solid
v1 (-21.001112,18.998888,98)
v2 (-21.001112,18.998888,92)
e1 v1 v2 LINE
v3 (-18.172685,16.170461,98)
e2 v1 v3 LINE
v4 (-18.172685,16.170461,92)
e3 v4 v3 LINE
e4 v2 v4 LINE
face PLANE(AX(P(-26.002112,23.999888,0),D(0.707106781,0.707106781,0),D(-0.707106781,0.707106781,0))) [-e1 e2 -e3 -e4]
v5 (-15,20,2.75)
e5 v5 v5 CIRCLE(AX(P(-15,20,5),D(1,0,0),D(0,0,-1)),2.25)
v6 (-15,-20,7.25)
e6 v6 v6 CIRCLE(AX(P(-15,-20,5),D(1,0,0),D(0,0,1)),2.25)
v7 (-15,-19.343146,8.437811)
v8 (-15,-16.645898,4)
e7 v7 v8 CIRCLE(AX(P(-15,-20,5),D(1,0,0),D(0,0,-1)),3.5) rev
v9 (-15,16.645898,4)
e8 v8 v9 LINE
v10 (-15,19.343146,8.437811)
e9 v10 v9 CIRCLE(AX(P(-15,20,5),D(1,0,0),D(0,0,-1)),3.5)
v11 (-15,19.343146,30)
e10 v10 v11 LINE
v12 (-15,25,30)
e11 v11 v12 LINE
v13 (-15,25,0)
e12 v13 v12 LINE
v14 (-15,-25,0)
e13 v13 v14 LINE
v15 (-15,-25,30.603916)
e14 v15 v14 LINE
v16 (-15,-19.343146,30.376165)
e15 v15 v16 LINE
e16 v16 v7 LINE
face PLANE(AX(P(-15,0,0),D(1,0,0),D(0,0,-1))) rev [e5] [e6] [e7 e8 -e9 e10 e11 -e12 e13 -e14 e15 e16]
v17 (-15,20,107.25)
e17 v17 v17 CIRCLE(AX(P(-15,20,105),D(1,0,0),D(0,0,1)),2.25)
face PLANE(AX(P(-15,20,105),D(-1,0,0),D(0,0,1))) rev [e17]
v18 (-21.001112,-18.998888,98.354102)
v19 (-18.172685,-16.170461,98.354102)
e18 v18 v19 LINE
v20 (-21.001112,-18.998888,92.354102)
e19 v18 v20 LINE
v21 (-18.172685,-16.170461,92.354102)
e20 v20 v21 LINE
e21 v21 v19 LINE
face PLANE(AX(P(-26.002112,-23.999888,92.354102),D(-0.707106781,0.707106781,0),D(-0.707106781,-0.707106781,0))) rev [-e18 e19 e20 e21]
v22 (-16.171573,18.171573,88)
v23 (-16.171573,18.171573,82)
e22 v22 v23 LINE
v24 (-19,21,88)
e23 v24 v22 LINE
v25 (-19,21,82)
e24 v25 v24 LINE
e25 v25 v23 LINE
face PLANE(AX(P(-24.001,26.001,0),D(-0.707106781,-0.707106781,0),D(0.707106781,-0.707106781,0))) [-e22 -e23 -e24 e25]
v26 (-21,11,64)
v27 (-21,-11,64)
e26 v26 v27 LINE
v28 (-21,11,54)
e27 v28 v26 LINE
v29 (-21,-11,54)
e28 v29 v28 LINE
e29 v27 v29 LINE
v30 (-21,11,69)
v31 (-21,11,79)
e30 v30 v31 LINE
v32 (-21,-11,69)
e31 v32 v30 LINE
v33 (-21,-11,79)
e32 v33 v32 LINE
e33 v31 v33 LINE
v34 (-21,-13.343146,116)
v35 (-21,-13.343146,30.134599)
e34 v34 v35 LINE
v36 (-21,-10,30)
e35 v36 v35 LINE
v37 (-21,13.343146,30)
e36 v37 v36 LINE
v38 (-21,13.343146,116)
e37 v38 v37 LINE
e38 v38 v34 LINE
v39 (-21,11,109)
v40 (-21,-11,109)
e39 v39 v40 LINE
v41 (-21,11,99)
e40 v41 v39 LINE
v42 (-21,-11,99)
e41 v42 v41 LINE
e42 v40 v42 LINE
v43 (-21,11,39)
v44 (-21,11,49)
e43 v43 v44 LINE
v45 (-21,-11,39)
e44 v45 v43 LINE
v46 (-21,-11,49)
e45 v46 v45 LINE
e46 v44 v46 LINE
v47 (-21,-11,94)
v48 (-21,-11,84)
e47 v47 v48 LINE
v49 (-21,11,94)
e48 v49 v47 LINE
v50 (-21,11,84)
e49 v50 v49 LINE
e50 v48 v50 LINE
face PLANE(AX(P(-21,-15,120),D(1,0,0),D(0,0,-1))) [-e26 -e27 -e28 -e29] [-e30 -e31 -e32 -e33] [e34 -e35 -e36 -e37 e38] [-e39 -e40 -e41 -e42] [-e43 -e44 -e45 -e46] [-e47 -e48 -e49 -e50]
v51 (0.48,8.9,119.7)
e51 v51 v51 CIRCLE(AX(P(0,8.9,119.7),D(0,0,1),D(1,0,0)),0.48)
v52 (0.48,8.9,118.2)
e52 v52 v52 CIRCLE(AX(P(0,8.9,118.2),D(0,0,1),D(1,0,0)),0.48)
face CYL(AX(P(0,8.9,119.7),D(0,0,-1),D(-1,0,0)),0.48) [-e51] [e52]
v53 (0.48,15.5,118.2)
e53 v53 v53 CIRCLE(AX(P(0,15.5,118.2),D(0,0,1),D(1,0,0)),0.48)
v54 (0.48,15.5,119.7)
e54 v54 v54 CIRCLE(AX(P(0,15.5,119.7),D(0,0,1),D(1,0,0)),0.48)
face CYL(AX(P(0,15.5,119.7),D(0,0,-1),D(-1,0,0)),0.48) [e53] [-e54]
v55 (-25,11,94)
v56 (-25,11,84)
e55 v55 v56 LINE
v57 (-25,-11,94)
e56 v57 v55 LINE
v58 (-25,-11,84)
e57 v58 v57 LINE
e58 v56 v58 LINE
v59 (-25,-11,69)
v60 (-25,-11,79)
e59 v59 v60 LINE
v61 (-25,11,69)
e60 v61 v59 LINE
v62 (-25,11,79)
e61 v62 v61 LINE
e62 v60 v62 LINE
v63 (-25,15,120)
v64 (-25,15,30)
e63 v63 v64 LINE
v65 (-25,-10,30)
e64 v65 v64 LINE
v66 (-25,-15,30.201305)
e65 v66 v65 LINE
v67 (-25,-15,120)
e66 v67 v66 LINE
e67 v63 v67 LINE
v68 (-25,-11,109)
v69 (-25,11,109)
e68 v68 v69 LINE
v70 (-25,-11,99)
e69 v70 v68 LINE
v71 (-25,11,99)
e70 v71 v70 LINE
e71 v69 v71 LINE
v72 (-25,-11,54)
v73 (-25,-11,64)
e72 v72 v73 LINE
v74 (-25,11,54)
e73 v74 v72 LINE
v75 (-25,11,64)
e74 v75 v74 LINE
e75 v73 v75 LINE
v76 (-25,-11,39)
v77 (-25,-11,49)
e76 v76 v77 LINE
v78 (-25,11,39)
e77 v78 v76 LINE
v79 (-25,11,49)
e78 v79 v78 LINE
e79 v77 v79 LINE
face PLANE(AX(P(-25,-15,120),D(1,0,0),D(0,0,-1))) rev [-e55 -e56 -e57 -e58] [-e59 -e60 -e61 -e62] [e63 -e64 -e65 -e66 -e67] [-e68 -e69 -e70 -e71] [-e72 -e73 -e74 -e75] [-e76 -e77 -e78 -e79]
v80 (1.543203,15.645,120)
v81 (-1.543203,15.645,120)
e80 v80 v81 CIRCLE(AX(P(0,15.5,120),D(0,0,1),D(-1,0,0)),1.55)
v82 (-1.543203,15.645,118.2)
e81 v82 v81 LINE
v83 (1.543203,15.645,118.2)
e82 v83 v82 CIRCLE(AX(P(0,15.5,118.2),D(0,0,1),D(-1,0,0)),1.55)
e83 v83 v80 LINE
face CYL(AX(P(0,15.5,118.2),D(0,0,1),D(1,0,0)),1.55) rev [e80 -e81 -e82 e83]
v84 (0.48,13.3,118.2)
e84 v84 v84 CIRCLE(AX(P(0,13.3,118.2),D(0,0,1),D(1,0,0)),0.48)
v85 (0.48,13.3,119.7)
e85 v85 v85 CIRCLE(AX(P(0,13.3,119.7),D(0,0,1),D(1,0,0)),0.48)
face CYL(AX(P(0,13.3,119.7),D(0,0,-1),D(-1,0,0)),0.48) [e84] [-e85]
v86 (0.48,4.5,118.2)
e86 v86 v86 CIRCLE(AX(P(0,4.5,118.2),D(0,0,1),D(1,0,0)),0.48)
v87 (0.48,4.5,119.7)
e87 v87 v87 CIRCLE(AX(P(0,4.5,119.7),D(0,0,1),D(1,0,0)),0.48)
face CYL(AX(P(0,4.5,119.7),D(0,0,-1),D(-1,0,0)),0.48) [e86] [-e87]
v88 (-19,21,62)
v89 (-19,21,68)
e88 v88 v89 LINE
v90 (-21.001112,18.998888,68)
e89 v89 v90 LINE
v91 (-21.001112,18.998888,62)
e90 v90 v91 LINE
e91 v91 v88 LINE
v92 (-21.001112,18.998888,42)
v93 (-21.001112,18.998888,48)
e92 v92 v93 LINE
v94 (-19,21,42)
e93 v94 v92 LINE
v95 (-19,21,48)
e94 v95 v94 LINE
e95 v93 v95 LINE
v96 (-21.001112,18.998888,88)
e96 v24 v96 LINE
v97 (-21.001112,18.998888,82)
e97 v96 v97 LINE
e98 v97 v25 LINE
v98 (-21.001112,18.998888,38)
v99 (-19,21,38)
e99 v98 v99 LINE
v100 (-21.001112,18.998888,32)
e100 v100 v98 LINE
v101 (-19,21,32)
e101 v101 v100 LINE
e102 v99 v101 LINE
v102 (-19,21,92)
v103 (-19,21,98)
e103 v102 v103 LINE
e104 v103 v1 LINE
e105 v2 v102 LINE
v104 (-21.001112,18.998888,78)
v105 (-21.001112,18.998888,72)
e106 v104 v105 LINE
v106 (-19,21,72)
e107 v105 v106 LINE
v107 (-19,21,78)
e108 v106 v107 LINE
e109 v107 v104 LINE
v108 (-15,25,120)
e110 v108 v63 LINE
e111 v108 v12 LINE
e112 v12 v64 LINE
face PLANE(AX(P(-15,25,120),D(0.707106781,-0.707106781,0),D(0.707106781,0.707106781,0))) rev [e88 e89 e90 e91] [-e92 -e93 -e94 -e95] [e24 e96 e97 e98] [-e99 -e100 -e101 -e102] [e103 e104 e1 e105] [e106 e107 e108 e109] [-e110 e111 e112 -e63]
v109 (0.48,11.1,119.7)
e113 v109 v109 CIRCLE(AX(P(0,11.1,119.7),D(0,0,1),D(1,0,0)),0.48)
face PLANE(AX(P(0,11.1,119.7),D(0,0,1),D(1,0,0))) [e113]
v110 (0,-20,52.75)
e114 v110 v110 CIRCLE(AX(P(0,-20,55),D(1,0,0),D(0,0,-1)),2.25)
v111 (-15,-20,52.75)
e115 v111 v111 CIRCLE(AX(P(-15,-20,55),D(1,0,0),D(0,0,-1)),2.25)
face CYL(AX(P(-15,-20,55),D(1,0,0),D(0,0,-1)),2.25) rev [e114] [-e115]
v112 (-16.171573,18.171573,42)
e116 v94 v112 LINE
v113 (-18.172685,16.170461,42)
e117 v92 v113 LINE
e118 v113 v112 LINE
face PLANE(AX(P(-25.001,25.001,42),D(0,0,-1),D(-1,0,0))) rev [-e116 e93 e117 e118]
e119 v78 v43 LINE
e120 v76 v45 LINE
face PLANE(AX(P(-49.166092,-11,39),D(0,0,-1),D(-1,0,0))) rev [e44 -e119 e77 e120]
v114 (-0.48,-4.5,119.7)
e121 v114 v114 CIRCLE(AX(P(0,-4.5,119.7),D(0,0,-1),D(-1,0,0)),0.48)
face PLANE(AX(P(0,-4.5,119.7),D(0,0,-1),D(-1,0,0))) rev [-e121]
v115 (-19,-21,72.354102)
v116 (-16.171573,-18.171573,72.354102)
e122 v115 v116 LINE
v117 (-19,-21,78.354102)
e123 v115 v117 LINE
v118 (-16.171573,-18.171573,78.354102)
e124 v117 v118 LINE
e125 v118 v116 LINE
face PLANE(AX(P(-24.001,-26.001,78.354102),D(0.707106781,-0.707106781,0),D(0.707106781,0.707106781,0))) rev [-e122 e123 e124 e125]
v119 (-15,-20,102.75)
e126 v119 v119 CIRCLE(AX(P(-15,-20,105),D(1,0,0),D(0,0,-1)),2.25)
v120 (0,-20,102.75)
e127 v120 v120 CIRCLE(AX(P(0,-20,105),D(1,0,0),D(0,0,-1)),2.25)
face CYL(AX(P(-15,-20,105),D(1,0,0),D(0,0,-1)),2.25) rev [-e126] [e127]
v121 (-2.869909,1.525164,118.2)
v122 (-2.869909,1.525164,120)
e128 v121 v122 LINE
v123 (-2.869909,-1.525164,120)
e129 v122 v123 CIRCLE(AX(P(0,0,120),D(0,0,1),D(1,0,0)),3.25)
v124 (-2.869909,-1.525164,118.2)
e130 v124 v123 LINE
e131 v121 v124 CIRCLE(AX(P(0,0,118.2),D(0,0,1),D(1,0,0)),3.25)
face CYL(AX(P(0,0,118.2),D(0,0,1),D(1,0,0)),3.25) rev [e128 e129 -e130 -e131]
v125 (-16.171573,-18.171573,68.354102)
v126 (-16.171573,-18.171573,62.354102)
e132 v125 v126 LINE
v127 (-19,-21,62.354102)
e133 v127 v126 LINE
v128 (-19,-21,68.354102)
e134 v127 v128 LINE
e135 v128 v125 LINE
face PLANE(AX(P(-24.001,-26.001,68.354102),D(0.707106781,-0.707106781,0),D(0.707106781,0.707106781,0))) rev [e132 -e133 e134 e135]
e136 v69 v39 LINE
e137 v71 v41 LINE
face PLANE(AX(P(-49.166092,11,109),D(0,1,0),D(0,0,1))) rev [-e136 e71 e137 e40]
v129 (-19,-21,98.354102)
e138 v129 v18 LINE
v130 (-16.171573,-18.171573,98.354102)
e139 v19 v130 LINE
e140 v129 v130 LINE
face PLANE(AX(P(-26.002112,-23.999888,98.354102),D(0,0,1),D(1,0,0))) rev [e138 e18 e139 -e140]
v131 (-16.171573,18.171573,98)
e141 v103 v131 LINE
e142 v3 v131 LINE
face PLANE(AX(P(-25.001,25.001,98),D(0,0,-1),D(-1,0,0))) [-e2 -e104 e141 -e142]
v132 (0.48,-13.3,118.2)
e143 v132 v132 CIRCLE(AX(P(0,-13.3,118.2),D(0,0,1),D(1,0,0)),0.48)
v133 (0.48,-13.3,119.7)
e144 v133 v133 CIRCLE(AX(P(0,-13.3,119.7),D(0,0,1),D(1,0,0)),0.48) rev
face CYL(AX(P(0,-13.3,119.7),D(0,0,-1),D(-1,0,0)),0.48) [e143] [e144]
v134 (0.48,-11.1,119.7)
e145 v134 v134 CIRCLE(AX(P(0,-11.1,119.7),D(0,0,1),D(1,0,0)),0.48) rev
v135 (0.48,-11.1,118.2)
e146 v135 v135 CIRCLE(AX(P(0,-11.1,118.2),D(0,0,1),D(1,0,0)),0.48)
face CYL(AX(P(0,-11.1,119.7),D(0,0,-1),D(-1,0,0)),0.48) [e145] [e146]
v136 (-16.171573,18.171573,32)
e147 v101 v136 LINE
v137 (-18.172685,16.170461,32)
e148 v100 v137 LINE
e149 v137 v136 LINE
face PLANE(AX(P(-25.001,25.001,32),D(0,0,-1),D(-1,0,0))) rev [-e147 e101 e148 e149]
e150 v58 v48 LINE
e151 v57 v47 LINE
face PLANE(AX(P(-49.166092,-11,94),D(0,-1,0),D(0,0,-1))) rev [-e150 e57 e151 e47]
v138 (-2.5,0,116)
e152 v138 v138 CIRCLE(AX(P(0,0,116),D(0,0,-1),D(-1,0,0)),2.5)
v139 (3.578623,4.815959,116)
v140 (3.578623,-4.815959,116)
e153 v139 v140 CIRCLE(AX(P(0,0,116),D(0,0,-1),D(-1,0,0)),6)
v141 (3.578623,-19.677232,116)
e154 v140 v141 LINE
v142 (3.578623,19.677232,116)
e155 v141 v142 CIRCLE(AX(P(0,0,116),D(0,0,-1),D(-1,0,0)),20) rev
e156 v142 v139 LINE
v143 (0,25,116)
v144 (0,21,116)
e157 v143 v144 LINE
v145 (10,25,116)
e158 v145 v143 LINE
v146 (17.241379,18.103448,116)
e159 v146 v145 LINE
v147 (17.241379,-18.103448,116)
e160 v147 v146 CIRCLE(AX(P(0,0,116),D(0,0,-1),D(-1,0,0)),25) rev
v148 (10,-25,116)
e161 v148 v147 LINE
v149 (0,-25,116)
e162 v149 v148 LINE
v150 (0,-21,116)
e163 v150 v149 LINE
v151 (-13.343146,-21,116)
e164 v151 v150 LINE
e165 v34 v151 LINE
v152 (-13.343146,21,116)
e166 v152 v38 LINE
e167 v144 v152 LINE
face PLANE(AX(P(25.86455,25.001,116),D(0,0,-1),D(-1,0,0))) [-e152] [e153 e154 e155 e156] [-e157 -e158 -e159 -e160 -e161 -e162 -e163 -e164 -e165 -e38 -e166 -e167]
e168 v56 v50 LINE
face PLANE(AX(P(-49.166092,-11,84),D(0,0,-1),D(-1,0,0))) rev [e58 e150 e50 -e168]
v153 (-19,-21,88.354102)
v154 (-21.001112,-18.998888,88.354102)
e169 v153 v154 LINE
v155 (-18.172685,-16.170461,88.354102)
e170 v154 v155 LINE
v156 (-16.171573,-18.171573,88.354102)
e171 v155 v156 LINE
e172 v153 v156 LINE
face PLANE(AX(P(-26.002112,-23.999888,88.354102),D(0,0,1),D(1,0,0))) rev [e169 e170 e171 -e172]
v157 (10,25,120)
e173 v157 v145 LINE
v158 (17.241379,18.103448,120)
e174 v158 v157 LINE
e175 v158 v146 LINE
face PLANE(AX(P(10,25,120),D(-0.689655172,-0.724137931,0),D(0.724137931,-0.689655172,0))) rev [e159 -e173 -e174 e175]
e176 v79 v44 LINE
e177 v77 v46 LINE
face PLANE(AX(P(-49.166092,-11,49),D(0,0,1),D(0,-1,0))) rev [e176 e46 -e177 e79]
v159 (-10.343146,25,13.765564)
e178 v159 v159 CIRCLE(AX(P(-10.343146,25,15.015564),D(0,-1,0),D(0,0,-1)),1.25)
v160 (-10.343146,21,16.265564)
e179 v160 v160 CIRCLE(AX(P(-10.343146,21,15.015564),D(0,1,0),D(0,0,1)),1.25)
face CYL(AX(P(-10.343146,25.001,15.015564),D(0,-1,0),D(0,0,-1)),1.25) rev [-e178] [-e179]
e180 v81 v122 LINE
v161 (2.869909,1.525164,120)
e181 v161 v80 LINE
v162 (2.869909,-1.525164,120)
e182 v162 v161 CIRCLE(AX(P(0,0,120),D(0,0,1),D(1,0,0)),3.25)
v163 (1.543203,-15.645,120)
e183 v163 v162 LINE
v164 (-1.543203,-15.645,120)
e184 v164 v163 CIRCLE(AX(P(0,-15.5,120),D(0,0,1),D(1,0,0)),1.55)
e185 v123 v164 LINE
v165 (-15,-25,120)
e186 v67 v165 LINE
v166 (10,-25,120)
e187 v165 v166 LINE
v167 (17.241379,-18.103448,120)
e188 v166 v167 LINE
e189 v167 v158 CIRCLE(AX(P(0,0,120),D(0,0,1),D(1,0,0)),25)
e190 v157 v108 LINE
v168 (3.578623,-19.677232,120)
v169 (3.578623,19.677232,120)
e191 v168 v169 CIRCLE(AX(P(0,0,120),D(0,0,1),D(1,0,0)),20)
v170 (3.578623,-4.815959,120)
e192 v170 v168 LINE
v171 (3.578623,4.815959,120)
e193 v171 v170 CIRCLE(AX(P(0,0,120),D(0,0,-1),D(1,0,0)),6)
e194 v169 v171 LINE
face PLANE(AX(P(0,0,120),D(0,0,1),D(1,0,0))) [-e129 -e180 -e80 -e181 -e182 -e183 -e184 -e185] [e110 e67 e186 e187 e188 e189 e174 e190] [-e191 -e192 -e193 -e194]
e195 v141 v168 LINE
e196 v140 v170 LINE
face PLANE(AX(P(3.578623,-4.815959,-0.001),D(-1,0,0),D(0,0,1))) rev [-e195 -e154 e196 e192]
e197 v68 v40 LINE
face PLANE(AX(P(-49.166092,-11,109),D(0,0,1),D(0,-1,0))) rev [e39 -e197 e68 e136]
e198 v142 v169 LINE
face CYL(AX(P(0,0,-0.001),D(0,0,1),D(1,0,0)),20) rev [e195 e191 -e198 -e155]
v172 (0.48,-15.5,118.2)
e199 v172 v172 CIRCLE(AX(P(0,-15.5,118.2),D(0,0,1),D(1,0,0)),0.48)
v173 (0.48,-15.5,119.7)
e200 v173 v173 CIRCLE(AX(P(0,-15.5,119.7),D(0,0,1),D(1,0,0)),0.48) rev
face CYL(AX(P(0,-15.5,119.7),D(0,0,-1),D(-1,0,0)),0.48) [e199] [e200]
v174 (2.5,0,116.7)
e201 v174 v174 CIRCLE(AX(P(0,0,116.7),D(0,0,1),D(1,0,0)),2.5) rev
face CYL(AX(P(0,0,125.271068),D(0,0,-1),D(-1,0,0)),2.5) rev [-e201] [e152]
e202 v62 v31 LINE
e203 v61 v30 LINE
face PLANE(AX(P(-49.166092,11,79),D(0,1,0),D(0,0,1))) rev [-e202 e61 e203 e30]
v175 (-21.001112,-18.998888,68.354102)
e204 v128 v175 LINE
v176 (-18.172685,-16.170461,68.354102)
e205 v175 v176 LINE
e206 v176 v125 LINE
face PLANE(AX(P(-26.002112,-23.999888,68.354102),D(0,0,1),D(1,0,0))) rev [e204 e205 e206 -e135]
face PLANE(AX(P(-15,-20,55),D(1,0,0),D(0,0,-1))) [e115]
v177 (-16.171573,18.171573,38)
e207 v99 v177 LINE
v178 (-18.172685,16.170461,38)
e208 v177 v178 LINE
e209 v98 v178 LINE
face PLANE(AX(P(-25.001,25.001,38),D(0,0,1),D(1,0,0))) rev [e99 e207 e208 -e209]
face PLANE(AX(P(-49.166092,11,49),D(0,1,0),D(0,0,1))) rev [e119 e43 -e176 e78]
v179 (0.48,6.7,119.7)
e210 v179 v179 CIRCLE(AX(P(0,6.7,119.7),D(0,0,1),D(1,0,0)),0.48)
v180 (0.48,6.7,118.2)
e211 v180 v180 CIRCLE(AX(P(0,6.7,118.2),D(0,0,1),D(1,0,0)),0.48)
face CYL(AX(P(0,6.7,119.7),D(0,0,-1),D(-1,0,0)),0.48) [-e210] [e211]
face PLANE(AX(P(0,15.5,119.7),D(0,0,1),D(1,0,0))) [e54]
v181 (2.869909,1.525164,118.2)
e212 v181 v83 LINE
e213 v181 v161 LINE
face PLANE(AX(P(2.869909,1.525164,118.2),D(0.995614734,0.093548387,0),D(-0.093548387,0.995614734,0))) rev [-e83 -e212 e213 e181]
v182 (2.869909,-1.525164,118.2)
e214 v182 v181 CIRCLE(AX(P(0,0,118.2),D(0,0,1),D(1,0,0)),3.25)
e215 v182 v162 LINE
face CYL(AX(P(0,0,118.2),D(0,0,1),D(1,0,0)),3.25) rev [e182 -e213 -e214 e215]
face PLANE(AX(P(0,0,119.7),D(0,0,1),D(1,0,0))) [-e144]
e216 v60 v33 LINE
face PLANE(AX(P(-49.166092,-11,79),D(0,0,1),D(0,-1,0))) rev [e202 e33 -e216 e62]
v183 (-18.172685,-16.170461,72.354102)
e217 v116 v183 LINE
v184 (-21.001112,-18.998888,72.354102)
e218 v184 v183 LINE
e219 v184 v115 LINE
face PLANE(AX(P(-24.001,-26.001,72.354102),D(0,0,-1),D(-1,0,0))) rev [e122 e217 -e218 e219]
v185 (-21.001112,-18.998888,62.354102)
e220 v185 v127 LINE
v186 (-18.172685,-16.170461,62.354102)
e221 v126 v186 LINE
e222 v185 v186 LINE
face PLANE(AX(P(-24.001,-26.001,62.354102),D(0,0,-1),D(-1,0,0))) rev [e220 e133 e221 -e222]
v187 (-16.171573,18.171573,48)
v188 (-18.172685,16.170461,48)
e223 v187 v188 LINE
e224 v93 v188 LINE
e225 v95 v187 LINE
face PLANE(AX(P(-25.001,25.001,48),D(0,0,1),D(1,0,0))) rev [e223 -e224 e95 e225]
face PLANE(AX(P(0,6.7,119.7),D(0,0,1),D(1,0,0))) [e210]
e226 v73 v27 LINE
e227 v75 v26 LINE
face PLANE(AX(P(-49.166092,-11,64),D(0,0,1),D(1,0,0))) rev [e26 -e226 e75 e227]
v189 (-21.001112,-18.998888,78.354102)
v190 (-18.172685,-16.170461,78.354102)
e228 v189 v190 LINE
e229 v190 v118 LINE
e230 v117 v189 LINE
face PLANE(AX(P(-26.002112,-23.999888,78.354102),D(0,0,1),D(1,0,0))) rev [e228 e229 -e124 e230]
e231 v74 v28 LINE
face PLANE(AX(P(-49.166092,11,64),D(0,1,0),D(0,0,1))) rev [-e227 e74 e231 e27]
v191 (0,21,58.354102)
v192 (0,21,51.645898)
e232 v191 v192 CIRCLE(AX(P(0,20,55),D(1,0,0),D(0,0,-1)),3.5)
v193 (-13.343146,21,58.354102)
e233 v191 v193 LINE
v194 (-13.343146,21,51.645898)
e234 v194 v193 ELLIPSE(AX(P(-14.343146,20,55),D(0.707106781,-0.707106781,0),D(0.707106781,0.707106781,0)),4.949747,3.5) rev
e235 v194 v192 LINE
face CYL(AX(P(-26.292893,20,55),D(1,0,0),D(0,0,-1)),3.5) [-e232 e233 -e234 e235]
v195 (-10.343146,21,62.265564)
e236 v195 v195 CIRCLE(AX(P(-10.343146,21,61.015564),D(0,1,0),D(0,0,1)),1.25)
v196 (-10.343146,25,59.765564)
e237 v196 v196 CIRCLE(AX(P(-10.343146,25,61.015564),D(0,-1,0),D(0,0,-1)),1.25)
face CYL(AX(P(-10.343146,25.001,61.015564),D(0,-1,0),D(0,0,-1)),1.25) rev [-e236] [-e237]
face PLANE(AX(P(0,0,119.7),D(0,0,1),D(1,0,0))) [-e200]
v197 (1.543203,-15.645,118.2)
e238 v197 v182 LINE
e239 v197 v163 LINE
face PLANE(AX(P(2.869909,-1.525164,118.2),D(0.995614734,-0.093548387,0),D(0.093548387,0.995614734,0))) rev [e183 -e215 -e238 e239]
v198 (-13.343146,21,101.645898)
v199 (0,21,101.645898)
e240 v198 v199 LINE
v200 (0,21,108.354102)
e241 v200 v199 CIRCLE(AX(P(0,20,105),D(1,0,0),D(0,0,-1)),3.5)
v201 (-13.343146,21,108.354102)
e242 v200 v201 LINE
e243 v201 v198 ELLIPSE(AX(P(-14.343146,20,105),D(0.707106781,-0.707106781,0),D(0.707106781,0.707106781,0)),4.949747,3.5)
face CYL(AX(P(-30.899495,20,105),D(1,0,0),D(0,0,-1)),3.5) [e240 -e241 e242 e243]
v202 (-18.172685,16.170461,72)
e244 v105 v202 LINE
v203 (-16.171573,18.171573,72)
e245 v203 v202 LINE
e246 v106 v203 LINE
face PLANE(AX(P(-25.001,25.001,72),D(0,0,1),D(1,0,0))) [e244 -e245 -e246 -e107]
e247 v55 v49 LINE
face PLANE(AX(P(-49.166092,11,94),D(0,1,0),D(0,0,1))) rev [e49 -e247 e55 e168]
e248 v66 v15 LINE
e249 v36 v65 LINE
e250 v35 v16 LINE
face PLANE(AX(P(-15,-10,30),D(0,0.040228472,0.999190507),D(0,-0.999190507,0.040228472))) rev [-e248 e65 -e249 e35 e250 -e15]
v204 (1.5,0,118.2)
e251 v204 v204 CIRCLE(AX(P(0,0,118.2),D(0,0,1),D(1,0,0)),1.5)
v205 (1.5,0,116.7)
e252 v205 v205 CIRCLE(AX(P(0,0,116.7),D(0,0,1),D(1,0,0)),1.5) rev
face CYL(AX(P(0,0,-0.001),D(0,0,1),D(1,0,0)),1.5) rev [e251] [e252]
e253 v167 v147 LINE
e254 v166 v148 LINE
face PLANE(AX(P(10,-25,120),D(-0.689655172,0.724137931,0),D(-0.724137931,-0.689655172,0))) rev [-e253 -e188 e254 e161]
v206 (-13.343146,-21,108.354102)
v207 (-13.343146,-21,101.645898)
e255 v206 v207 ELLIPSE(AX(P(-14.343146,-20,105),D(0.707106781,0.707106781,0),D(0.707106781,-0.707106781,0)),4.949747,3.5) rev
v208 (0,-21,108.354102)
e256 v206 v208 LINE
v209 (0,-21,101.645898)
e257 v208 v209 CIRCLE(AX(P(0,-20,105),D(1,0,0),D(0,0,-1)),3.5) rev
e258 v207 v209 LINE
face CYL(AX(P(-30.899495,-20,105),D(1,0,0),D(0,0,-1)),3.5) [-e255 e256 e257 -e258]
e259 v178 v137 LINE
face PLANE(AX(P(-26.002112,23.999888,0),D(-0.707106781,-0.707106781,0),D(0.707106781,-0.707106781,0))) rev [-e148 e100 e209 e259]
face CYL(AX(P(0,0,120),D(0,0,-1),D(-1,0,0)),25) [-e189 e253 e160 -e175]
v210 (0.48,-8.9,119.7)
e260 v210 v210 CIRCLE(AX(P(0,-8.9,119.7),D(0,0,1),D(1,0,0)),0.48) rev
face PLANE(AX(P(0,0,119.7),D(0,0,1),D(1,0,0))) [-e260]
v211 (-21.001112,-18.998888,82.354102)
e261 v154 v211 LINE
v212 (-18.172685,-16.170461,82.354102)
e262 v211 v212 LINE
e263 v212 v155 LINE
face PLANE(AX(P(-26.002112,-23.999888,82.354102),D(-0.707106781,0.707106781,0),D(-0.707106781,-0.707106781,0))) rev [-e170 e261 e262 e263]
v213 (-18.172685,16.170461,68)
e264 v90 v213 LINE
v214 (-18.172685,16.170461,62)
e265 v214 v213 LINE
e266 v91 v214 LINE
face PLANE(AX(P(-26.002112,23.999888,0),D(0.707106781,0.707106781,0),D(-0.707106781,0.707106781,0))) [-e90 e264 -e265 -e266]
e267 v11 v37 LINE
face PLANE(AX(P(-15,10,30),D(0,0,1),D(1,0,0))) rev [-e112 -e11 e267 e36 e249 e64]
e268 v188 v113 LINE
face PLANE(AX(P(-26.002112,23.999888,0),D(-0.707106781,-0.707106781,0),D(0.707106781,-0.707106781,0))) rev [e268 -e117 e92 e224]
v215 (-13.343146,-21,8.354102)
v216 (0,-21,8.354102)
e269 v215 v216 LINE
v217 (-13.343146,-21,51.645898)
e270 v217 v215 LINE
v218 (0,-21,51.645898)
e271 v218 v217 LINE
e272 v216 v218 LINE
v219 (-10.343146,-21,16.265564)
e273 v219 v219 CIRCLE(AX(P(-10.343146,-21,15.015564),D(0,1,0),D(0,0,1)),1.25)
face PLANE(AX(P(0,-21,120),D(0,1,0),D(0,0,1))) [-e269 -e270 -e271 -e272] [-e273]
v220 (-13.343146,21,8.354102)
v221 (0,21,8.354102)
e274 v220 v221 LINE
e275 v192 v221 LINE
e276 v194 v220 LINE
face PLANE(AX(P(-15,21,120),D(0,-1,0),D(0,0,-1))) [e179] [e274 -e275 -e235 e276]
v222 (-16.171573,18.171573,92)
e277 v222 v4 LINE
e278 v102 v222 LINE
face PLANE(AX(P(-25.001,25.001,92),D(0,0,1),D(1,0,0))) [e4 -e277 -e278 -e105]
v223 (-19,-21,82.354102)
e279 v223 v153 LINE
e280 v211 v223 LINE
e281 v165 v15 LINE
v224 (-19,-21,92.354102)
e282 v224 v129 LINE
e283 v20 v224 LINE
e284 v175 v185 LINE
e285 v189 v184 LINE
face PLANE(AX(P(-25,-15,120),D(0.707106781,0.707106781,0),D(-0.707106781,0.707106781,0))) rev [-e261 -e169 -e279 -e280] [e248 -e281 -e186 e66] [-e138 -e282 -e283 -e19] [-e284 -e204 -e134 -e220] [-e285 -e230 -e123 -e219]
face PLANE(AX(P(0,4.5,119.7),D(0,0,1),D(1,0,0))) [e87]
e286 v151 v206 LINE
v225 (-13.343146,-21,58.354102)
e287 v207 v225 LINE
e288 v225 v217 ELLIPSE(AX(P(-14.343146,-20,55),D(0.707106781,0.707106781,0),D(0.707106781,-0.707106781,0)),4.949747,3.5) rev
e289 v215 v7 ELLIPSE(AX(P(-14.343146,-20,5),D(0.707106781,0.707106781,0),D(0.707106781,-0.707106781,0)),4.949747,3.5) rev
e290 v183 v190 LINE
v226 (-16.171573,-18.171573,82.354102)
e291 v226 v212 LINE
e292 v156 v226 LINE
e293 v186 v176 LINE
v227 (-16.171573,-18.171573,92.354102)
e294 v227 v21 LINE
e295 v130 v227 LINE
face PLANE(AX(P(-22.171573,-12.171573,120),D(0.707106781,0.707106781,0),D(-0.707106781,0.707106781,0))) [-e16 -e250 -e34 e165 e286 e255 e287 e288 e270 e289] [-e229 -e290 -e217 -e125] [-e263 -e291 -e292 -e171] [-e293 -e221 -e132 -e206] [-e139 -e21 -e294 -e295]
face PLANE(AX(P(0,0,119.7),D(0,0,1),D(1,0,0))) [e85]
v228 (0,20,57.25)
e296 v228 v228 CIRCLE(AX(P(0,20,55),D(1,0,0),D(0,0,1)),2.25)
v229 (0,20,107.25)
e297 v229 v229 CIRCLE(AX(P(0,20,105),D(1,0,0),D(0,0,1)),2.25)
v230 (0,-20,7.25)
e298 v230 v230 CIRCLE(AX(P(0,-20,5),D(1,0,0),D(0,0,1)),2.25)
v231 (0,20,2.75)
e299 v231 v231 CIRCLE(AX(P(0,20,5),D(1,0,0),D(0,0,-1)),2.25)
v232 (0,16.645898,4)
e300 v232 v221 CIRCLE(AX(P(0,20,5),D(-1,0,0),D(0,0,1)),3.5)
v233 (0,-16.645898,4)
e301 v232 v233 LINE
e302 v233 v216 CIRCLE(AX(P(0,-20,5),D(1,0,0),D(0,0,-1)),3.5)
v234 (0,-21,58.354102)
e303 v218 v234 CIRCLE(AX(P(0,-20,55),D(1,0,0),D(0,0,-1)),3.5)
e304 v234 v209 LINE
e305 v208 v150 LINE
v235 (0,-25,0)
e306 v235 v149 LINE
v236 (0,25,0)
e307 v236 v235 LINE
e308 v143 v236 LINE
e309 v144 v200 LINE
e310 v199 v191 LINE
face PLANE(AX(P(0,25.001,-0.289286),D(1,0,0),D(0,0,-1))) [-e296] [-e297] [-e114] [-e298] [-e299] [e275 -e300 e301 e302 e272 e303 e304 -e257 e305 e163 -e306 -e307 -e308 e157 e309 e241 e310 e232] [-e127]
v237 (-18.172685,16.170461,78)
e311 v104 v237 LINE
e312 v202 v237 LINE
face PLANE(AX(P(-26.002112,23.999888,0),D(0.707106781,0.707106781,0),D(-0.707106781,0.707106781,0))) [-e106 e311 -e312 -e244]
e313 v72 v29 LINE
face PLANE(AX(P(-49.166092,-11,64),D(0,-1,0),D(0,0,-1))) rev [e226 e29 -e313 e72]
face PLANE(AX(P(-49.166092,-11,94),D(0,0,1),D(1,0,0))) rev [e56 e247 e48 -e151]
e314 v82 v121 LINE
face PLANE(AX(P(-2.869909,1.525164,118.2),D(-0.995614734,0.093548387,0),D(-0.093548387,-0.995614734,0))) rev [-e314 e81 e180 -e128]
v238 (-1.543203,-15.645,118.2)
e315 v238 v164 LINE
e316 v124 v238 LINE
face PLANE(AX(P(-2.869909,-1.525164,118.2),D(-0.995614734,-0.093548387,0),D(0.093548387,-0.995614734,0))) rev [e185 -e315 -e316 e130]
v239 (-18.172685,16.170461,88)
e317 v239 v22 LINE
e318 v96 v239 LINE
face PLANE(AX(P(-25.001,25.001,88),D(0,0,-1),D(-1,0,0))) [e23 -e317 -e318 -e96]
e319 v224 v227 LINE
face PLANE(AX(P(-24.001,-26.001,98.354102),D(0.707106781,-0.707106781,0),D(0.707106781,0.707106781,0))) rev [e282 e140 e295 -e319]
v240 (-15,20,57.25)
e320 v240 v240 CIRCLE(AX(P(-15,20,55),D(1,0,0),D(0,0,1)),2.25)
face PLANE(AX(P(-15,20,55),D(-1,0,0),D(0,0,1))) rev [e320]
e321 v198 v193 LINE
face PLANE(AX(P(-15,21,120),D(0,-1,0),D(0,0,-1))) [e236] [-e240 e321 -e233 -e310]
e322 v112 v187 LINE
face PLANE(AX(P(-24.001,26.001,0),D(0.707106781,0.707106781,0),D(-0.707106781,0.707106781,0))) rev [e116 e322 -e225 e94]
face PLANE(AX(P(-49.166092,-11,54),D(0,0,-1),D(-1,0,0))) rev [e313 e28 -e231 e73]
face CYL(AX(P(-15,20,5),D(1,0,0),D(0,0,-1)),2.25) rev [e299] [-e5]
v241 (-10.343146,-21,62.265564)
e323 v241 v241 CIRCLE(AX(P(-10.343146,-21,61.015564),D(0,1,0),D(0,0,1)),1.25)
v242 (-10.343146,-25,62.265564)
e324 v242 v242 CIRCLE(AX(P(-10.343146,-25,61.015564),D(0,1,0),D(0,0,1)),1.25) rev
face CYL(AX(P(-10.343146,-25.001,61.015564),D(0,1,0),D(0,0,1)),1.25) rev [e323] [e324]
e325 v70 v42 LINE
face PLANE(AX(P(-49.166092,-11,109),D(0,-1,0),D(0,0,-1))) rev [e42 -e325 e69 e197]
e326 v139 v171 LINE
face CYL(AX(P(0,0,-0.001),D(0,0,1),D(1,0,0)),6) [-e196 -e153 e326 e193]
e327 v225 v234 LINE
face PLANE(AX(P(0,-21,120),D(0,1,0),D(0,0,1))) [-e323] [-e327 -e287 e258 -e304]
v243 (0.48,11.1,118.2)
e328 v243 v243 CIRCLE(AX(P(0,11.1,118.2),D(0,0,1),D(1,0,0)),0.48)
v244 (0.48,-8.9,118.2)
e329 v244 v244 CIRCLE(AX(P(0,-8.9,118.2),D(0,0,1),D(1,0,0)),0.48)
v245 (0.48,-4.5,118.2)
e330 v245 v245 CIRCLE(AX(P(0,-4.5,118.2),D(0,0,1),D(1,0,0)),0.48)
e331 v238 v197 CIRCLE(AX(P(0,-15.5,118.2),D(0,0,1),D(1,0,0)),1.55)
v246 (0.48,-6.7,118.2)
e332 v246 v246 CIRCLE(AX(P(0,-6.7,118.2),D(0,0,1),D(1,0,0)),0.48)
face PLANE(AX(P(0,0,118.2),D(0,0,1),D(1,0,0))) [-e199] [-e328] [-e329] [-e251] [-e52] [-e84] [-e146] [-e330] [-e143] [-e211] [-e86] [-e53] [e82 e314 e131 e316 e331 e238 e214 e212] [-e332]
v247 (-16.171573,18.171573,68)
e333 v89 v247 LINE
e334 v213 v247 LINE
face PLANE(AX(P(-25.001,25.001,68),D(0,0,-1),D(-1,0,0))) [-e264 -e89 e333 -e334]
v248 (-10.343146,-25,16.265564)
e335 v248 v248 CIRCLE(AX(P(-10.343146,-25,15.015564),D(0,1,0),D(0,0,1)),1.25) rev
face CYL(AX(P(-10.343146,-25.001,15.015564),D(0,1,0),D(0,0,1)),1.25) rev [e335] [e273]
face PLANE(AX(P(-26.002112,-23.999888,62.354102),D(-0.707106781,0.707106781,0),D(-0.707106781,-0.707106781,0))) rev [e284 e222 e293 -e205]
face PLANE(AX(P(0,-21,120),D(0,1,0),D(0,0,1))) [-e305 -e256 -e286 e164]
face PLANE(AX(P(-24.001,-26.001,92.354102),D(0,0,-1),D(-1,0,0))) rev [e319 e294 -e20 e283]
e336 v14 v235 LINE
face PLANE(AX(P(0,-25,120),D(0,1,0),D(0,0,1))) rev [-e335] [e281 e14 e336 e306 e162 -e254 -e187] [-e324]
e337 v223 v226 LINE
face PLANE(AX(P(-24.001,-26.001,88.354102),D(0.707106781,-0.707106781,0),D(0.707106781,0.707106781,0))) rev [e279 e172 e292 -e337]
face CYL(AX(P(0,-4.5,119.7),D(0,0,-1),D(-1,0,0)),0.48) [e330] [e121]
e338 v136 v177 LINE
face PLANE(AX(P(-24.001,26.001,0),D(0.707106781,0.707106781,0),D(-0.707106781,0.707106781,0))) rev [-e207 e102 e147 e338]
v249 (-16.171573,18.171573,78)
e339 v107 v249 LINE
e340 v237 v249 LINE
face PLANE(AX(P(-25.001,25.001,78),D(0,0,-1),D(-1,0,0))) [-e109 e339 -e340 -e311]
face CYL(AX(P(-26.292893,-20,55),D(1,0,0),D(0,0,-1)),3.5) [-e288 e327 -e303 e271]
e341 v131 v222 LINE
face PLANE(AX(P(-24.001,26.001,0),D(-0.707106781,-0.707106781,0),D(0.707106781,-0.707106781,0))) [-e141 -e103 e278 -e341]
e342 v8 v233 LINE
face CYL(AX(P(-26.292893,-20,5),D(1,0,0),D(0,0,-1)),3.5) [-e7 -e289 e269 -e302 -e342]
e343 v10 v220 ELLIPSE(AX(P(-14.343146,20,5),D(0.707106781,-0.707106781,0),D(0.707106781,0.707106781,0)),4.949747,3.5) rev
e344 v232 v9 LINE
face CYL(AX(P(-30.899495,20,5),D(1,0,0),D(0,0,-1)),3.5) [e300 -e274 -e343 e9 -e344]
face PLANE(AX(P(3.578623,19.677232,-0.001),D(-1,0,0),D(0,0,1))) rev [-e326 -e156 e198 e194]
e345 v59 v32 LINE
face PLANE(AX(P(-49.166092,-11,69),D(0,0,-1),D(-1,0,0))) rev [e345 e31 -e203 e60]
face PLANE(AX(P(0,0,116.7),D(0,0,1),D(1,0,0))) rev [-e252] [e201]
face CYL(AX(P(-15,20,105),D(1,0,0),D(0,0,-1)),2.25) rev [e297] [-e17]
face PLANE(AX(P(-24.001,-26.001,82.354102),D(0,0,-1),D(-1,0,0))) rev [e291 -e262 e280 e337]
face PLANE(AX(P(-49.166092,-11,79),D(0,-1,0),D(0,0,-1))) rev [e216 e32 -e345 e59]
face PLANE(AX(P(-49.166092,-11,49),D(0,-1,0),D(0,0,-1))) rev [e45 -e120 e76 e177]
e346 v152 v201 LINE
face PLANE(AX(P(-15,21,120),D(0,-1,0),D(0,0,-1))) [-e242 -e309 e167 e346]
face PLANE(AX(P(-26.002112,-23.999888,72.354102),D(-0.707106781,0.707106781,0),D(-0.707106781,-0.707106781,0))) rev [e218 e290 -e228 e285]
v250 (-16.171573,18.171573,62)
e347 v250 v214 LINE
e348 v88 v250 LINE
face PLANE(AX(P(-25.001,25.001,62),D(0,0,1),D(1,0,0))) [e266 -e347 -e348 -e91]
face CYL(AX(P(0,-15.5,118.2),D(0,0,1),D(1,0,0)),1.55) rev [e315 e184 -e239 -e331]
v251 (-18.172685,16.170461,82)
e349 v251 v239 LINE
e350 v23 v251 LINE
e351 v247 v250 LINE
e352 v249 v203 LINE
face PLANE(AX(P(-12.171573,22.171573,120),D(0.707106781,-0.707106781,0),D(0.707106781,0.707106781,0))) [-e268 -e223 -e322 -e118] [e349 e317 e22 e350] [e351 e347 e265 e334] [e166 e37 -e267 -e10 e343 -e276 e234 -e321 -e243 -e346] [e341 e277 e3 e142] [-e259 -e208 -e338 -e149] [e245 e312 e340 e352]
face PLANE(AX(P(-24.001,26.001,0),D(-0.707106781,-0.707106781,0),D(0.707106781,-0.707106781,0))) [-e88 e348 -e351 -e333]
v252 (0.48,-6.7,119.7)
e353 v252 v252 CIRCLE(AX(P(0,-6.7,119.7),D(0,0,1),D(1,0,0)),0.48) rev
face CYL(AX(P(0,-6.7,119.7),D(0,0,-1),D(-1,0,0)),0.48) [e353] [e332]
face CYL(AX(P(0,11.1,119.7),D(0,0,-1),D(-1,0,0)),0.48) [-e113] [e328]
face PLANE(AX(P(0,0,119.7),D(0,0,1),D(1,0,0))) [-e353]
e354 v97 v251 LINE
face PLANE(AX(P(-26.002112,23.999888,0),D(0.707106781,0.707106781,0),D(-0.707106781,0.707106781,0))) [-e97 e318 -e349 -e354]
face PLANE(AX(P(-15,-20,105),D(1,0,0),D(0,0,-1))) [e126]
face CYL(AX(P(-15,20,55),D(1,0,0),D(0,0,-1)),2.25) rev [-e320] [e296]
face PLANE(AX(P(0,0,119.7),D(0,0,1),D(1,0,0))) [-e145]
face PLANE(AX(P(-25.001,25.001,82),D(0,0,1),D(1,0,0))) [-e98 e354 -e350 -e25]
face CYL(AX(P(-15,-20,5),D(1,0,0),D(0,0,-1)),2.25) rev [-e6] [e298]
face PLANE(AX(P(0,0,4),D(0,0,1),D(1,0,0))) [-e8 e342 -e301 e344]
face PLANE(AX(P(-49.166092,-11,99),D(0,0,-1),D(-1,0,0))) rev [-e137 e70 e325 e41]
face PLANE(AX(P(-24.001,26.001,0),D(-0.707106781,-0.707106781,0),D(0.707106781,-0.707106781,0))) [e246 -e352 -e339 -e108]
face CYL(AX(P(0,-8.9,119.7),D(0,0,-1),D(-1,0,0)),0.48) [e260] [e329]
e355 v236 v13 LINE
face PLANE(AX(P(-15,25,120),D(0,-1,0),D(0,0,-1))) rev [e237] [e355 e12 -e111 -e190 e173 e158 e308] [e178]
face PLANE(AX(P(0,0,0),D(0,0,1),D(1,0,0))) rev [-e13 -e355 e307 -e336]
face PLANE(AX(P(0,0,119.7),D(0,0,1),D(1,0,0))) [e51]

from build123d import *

# Parameters (mm, degrees)
BOSS_EXTRUDE1_DEPTH = 120
CUT_EXTRUDE1_REACH  = 134.382
SKETCH3_W           = 25.864549678
SKETCH3_H           = 116.289285906
SHELL1_START        = 4
SHELL1_DEPTH        = 112
CUT_EXTRUDE2_DEPTH  = 1.8
CUT_EXTRUDE3_REACH  = 125.374
SKETCH6_R           = 1.5
SKETCH7_R           = 2.5
CUT_EXTRUDE4_DEPTH  = 0.7
SKETCH8_R           = 0.48
BOSS_EXTRUDE2_DEPTH = 1.5
SKETCH8_3_R         = 0.48
BOSS_EXTRUDE3_DEPTH = 1.5
CUT_EXTRUDE5_REACH  = 127.1
BOSS_EXTRUDE6_REACH = 127.1
SKETCH15_R          = 3.5
CUT_EXTRUDE7_DEPTH  = 120
BOSS_EXTRUDE8_REACH = 127.1
SKETCH15_5_R        = 3.5
BOSS_EXTRUDE7_REACH = 127.1
SKETCH15_4_R        = 3.5
CUT_EXTRUDE8_DEPTH  = 120
SKETCH18_R          = 2.25
CUT_EXTRUDE9_DEPTH  = 15
CUT_EXTRUDE10_REACH = 132.924
SKETCH22_R          = 1.25
SKETCH23_W          = 10
SKETCH23_H          = 22
CUT_EXTRUDE11_DEPTH = 4
CUT_EXTRUDE13_REACH = 136.003
SKETCH25_W          = 6
SKETCH25_H          = 2.83
CUT_EXTRUDE14_REACH = 136.003
SKETCH26_W          = 6
SKETCH26_H          = 2.83
CUT_EXTRUDE15_DEPTH = 10


# Read off the part's stored shape, not the designer's step: Shell1
with BuildPart() as part:
    # Sketch2 → Boss-Extrude1 (new body)
    with BuildSketch(Plane.XY):
        with BuildLine():
            Line((0, -25), (-15, -25))
            Line((-15, -25), (-25, -15))
            Line((-25, -15), (-25, 15))
            Line((-25, 15), (-15, 25))
            Line((-15, 25), (0, 25))
            Line((0, 25), (10, 25))
            Line((10, 25), (17.24137931, 18.103448276))
            ThreePointArc((17.24137931, 18.103448276), (25, 0), (17.24137931, -18.103448276))
            Line((17.24137931, -18.103448276), (10, -25))
            Line((10, -25), (0, -25))
        make_face()
    extrude(amount=BOSS_EXTRUDE1_DEPTH)

    # Sketch3 → Cut-Extrude1 (cut, up to next)
    with BuildSketch(Plane(origin=(0, -25, 0), x_dir=(1, 0, 0), z_dir=(0, 1, 0)), mode=Mode.PRIVATE) as cut_extrude1_sk1:
        with Locations((12.932274839, -57.855357047)):
            Rectangle(SKETCH3_W, SKETCH3_H)
    cut_extrude1_tool1 = extrude(cut_extrude1_sk1.sketch, amount=CUT_EXTRUDE1_REACH, mode=Mode.PRIVATE) & part.part
    add(cut_extrude1_tool1.solids().sort_by_distance((12.932275, -25, 57.855357))[0], mode=Mode.SUBTRACT)

    # Shell1 outline → Shell1 (cut)
    with BuildSketch(Plane.XY.offset(SHELL1_START)):
        Polygon((-13.343145751, -21), (0, -21), (0, 21), (-13.343145751, 21), (-21, 13.343145751), (-21, -13.343145751), align=None)
    extrude(amount=SHELL1_DEPTH, mode=Mode.SUBTRACT)

    # Sketch5 → Cut-Extrude2 (cut)
    with BuildSketch(Plane.XY.offset(120)):
        with BuildLine():
            Line((-2.869908719, -1.525163579), (-1.543202838, -15.645))
            ThreePointArc((-1.543202838, -15.645), (0, -17.05), (1.543202838, -15.645))
            Line((1.543202838, -15.645), (2.869908719, -1.525163579))
            ThreePointArc((2.869908719, -1.525163579), (3.25, 0), (2.869908719, 1.525163579))
            Line((2.869908719, 1.525163579), (1.543202838, 15.645))
            ThreePointArc((1.543202838, 15.645), (0, 17.05), (-1.543202838, 15.645))
            Line((-1.543202838, 15.645), (-2.869908719, 1.525163579))
            ThreePointArc((-2.869908719, 1.525163579), (-3.25, 0), (-2.869908719, -1.525163579))
        make_face()
    extrude(amount=-CUT_EXTRUDE2_DEPTH, mode=Mode.SUBTRACT)

    # Sketch6 → Cut-Extrude3 (cut, up to next)
    with BuildSketch(Plane.XY.offset(118.2), mode=Mode.PRIVATE) as cut_extrude3_sk1:
        Circle(SKETCH6_R)
    cut_extrude3_tool1 = extrude(cut_extrude3_sk1.sketch, amount=-CUT_EXTRUDE3_REACH, mode=Mode.PRIVATE) & part.part
    add(cut_extrude3_tool1.solids().sort_by_distance((0, 0, 118.2))[0], mode=Mode.SUBTRACT)

    # Sketch7 → Cut-Extrude4 (cut)
    with BuildSketch(Plane(origin=(0, 0, 116), x_dir=(-1, 0, 0), z_dir=(0, 0, -1))):
        Circle(SKETCH7_R)
    extrude(amount=-CUT_EXTRUDE4_DEPTH, mode=Mode.SUBTRACT)

    # Sketch8 → Boss-Extrude2 (add)
    with BuildSketch(Plane.XY.offset(118.2)):
        with Locations((0, 13.3)):
            Circle(SKETCH8_R)
        with Locations((0, 8.9)):
            Circle(SKETCH8_R)
        with Locations((0, 15.5)):
            Circle(SKETCH8_R)
        with Locations((0, 11.1)):
            Circle(SKETCH8_R)
        with Locations((0, 6.7)):
            Circle(SKETCH8_R)
        with Locations((0, 4.5)):
            Circle(SKETCH8_R)
    extrude(amount=BOSS_EXTRUDE2_DEPTH)

    # Sketch8<3> → Boss-Extrude3 (add)
    with BuildSketch(Plane.XY.offset(118.2)):
        with Locations((0, -6.7)):
            Circle(SKETCH8_3_R)
        with Locations((0, -8.9)):
            Circle(SKETCH8_3_R)
        with Locations((0, -11.1)):
            Circle(SKETCH8_3_R)
        with Locations((0, -13.3)):
            Circle(SKETCH8_3_R)
        with Locations((0, -15.5)):
            Circle(SKETCH8_3_R)
        with Locations(Location((0, -4.5, 0), (0, 0, 180))):
            Circle(SKETCH8_3_R)
    extrude(amount=BOSS_EXTRUDE3_DEPTH)

    # Sketch9 → Cut-Extrude5 (cut, up to next)
    with BuildSketch(Plane.XY.offset(120), mode=Mode.PRIVATE) as cut_extrude5_sk1:
        with BuildLine():
            Line((3.578622529, 19.677232041), (3.578622529, 4.815958969))
            ThreePointArc((3.578622529, 4.815958969), (6, 0), (3.578622529, -4.815958969))
            Line((3.578622529, -4.815958969), (3.578622529, -19.677232041))
            ThreePointArc((3.578622529, -19.677232041), (20, 0), (3.578622529, 19.677232041))
        make_face()
    cut_extrude5_tool1 = extrude(cut_extrude5_sk1.sketch, amount=-CUT_EXTRUDE5_REACH, mode=Mode.PRIVATE) & part.part
    add(cut_extrude5_tool1.solids().sort_by_distance((10.656828, 0, 120))[0], mode=Mode.SUBTRACT)

    # Boss-Extrude6: up to this face of the body (flat: up to its plane)
    boss_extrude6_end = Plane(part.part.faces().sort_by_distance((-21, 0, 60))[0])
    # Sketch15 → Boss-Extrude6 (add, up to the picked face)
    with BuildSketch(Plane(origin=(0, 0, 0), x_dir=(0, 0, -1), z_dir=(1, 0, 0)), mode=Mode.PRIVATE) as boss_extrude6_sk1:
        with BuildLine():
            Line((-108.354101966, -21), (-101.645898034, -21))
            ThreePointArc((-101.645898034, -21), (-101.536666571, -20.505293538), (-101.5, -20))
            ThreePointArc((-101.5, -20), (-105.505293538, -16.536666571), (-108.354101966, -21))
        make_face()
    boss_extrude6_tool1 = split(extrude(boss_extrude6_sk1.sketch, amount=-BOSS_EXTRUDE6_REACH, mode=Mode.PRIVATE), bisect_by=boss_extrude6_end, keep=Keep.BOTH, mode=Mode.PRIVATE)
    # Sketch15 → Boss-Extrude6 (add, up to the picked face)
    with BuildSketch(Plane(origin=(0, 0, 0), x_dir=(0, 0, -1), z_dir=(1, 0, 0)), mode=Mode.PRIVATE) as boss_extrude6_sk2:
        with Locations((-5, 20)):
            Circle(SKETCH15_R)
    boss_extrude6_tool2 = split(extrude(boss_extrude6_sk2.sketch, amount=-BOSS_EXTRUDE6_REACH, mode=Mode.PRIVATE), bisect_by=boss_extrude6_end, keep=Keep.BOTH, mode=Mode.PRIVATE)
    # Sketch15 → Boss-Extrude6 (add, up to the picked face)
    with BuildSketch(Plane(origin=(0, 0, 0), x_dir=(0, 0, -1), z_dir=(1, 0, 0)), mode=Mode.PRIVATE) as boss_extrude6_sk3:
        with Locations((-105, 20)):
            Circle(SKETCH15_R)
    boss_extrude6_tool3 = split(extrude(boss_extrude6_sk3.sketch, amount=-BOSS_EXTRUDE6_REACH, mode=Mode.PRIVATE), bisect_by=boss_extrude6_end, keep=Keep.BOTH, mode=Mode.PRIVATE)
    add(boss_extrude6_tool1.solids().sort_by(Axis((0, -19.037867, 105), (-1, 0, 0)))[0])
    add(boss_extrude6_tool2.solids().sort_by(Axis((0, 20, 5), (-1, 0, 0)))[0])
    add(boss_extrude6_tool3.solids().sort_by(Axis((0, 20, 105), (-1, 0, 0)))[0])

    # Sketch16 → Cut-Extrude7 (cut)
    with BuildSketch(Plane(origin=(0, 0, 0), x_dir=(-1, 0, 0), z_dir=(0, 0, -1))):
        Polygon((15, 25), (25, 15), (21.747646776, 24.569697253), align=None)
    extrude(amount=-CUT_EXTRUDE7_DEPTH, mode=Mode.SUBTRACT)

    # Boss-Extrude8: up to this plane
    boss_extrude8_end = Plane(origin=(-12.171572875, 22.171572875, 120), z_dir=(0.7071067811865476, -0.7071067811865476, 0))
    # Sketch15<5> → Boss-Extrude8 (add, up to the surface)
    with BuildSketch(Plane(origin=(0, 0, 0), x_dir=(0, 0, -1), z_dir=(1, 0, 0)), mode=Mode.PRIVATE) as boss_extrude8_sk1:
        with Locations((-55, 20)):
            Circle(SKETCH15_5_R)
    boss_extrude8_tool1 = split(extrude(boss_extrude8_sk1.sketch, amount=-BOSS_EXTRUDE8_REACH, mode=Mode.PRIVATE), bisect_by=boss_extrude8_end, keep=Keep.BOTH, mode=Mode.PRIVATE)
    add(boss_extrude8_tool1.solids().sort_by_distance((0, 20, 55))[0])

    # Boss-Extrude7: up to this plane
    boss_extrude7_end = Plane(origin=(-22.171572875, -12.171572875, 120), z_dir=(0.7071067811865476, 0.7071067811865476, 0))
    # Sketch15<4> → Boss-Extrude7 (add, up to the surface)
    with BuildSketch(Plane(origin=(0, 0, 0), x_dir=(0, 0, -1), z_dir=(1, 0, 0)), mode=Mode.PRIVATE) as boss_extrude7_sk1:
        with Locations((-5, -20)):
            Circle(SKETCH15_4_R)
    boss_extrude7_tool1 = split(extrude(boss_extrude7_sk1.sketch, amount=-BOSS_EXTRUDE7_REACH, mode=Mode.PRIVATE), bisect_by=boss_extrude7_end, keep=Keep.BOTH, mode=Mode.PRIVATE)
    add(boss_extrude7_tool1.solids().sort_by_distance((0, -20, 5))[0])
    # Sketch15<4> → Boss-Extrude7 (add, up to the surface)
    with BuildSketch(Plane(origin=(0, 0, 0), x_dir=(0, 0, -1), z_dir=(1, 0, 0)), mode=Mode.PRIVATE) as boss_extrude7_sk2:
        with Locations((-55, -20)):
            Circle(SKETCH15_4_R)
    boss_extrude7_tool2 = split(extrude(boss_extrude7_sk2.sketch, amount=-BOSS_EXTRUDE7_REACH, mode=Mode.PRIVATE), bisect_by=boss_extrude7_end, keep=Keep.BOTH, mode=Mode.PRIVATE)
    add(boss_extrude7_tool2.solids().sort_by_distance((0, -20, 55))[0])

    # Sketch17 → Cut-Extrude8 (cut)
    with BuildSketch(Plane(origin=(0, 0, 0), x_dir=(-1, 0, 0), z_dir=(0, 0, -1))):
        Polygon((15, -25), (25, -15), (23.622900626, -22.657003141), align=None)
    extrude(amount=-CUT_EXTRUDE8_DEPTH, mode=Mode.SUBTRACT)

    # Sketch18 → Cut-Extrude9 (cut)
    with BuildSketch(Plane(origin=(0, 0, 0), x_dir=(0, 0, -1), z_dir=(1, 0, 0))):
        with Locations((-5, 20)):
            Circle(SKETCH18_R)
        with Locations(Location((-5, -20, 0), (0, 0, 180))):
            Circle(SKETCH18_R)
        with Locations(Location((-105, 20, 0), (0, 0, 180))):
            Circle(SKETCH18_R)
        with Locations((-105, -20)):
            Circle(SKETCH18_R)
        with Locations((-55, -20)):
            Circle(SKETCH18_R)
        with Locations(Location((-55, 20, 0), (0, 0, 180))):
            Circle(SKETCH18_R)
    extrude(amount=-CUT_EXTRUDE9_DEPTH, mode=Mode.SUBTRACT)

    # Sketch22 → Cut-Extrude10 (cut, up to next)
    with BuildSketch(Plane(origin=(0, -21, 0), x_dir=(1, 0, 0), z_dir=(0, 1, 0)), mode=Mode.PRIVATE) as cut_extrude10_sk1:
        with Locations(Location((-10.343145751, -15.015564437, 0), (0, 0, 270))):
            Circle(SKETCH22_R)
    cut_extrude10_tool1 = extrude(cut_extrude10_sk1.sketch, amount=-CUT_EXTRUDE10_REACH, mode=Mode.PRIVATE) & part.part
    # Sketch22 → Cut-Extrude10 (cut, up to next)
    with BuildSketch(Plane(origin=(0, -21, 0), x_dir=(1, 0, 0), z_dir=(0, 1, 0)), mode=Mode.PRIVATE) as cut_extrude10_sk2:
        with Locations(Location((-10.343145751, -61.015564437, 0), (0, 0, 270))):
            Circle(SKETCH22_R)
    cut_extrude10_tool2 = extrude(cut_extrude10_sk2.sketch, amount=-CUT_EXTRUDE10_REACH, mode=Mode.PRIVATE) & part.part
    cut_extrude10_1 = cut_extrude10_tool1.solids().sort_by_distance((-10.343146, -21, 15.015564))[0]
    add(cut_extrude10_1, mode=Mode.SUBTRACT)
    cut_extrude10_2 = cut_extrude10_tool2.solids().sort_by_distance((-10.343146, -21, 61.015564))[0]
    add(cut_extrude10_2, mode=Mode.SUBTRACT)
    cut_extrude10 = cut_extrude10_1 + cut_extrude10_2  # Cut-Extrude10 as one shape, for the pattern or mirror that repeats it

    # Mirror1: Cut-Extrude10 across plane
    add(cut_extrude10.mirror(Plane(origin=(0, 0, 0), x_dir=(0, 0, 1), z_dir=(0, -1, 0))), mode=Mode.SUBTRACT)

    # Sketch23 → Cut-Extrude11 (cut)
    with BuildSketch(Plane(origin=(-21, 0, 0), x_dir=(0, 0, -1), z_dir=(1, 0, 0))):
        with Locations((-44, 0)):
            Rectangle(SKETCH23_W, SKETCH23_H)
        with Locations((-59, 0)):
            Rectangle(SKETCH23_W, SKETCH23_H)
        with Locations((-74, 0)):
            Rectangle(SKETCH23_W, SKETCH23_H)
        with Locations((-89, 0)):
            Rectangle(SKETCH23_W, SKETCH23_H)
        with Locations((-104, 0)):
            Rectangle(SKETCH23_W, SKETCH23_H)
    extrude(amount=-CUT_EXTRUDE11_DEPTH, mode=Mode.SUBTRACT)

    # Sketch25 → Cut-Extrude13 (cut, up to next)
    with BuildSketch(Plane(origin=(-17.171572875, 17.171572875, 0), x_dir=(0, 0, -1), z_dir=(0.7071067811865477, -0.7071067811865475, 0)), mode=Mode.PRIVATE) as cut_extrude13_sk1:
        with Locations((-15, -0.000786438)):
            Rectangle(SKETCH25_W, SKETCH25_H)
    cut_extrude13_tool1 = extrude(cut_extrude13_sk1.sketch, amount=-CUT_EXTRUDE13_REACH, mode=Mode.PRIVATE) & part.part
    # Sketch25 → Cut-Extrude13 (cut, up to next)
    with BuildSketch(Plane(origin=(-17.171572875, 17.171572875, 0), x_dir=(0, 0, -1), z_dir=(0.7071067811865477, -0.7071067811865475, 0)), mode=Mode.PRIVATE) as cut_extrude13_sk2:
        with Locations((-25, -0.000786438)):
            Rectangle(SKETCH25_W, SKETCH25_H)
    cut_extrude13_tool2 = extrude(cut_extrude13_sk2.sketch, amount=-CUT_EXTRUDE13_REACH, mode=Mode.PRIVATE) & part.part
    # Sketch25 → Cut-Extrude13 (cut, up to next)
    with BuildSketch(Plane(origin=(-17.171572875, 17.171572875, 0), x_dir=(0, 0, -1), z_dir=(0.7071067811865477, -0.7071067811865475, 0)), mode=Mode.PRIVATE) as cut_extrude13_sk3:
        with Locations((-35, -0.000786438)):
            Rectangle(SKETCH25_W, SKETCH25_H)
    cut_extrude13_tool3 = extrude(cut_extrude13_sk3.sketch, amount=-CUT_EXTRUDE13_REACH, mode=Mode.PRIVATE) & part.part
    # Sketch25 → Cut-Extrude13 (cut, up to next)
    with BuildSketch(Plane(origin=(-17.171572875, 17.171572875, 0), x_dir=(0, 0, -1), z_dir=(0.7071067811865477, -0.7071067811865475, 0)), mode=Mode.PRIVATE) as cut_extrude13_sk4:
        with Locations((-45, -0.000786438)):
            Rectangle(SKETCH25_W, SKETCH25_H)
    cut_extrude13_tool4 = extrude(cut_extrude13_sk4.sketch, amount=-CUT_EXTRUDE13_REACH, mode=Mode.PRIVATE) & part.part
    # Sketch25 → Cut-Extrude13 (cut, up to next)
    with BuildSketch(Plane(origin=(-17.171572875, 17.171572875, 0), x_dir=(0, 0, -1), z_dir=(0.7071067811865477, -0.7071067811865475, 0)), mode=Mode.PRIVATE) as cut_extrude13_sk5:
        with Locations((-65, -0.000786438)):
            Rectangle(SKETCH25_W, SKETCH25_H)
    cut_extrude13_tool5 = extrude(cut_extrude13_sk5.sketch, amount=-CUT_EXTRUDE13_REACH, mode=Mode.PRIVATE) & part.part
    # Sketch25 → Cut-Extrude13 (cut, up to next)
    with BuildSketch(Plane(origin=(-17.171572875, 17.171572875, 0), x_dir=(0, 0, -1), z_dir=(0.7071067811865477, -0.7071067811865475, 0)), mode=Mode.PRIVATE) as cut_extrude13_sk6:
        with Locations((-95, -0.000786438)):
            Rectangle(SKETCH25_W, SKETCH25_H)
    cut_extrude13_tool6 = extrude(cut_extrude13_sk6.sketch, amount=-CUT_EXTRUDE13_REACH, mode=Mode.PRIVATE) & part.part
    # Sketch25 → Cut-Extrude13 (cut, up to next)
    with BuildSketch(Plane(origin=(-17.171572875, 17.171572875, 0), x_dir=(0, 0, -1), z_dir=(0.7071067811865477, -0.7071067811865475, 0)), mode=Mode.PRIVATE) as cut_extrude13_sk7:
        with Locations((-85, -0.000786438)):
            Rectangle(SKETCH25_W, SKETCH25_H)
    cut_extrude13_tool7 = extrude(cut_extrude13_sk7.sketch, amount=-CUT_EXTRUDE13_REACH, mode=Mode.PRIVATE) & part.part
    # Sketch25 → Cut-Extrude13 (cut, up to next)
    with BuildSketch(Plane(origin=(-17.171572875, 17.171572875, 0), x_dir=(0, 0, -1), z_dir=(0.7071067811865477, -0.7071067811865475, 0)), mode=Mode.PRIVATE) as cut_extrude13_sk8:
        with Locations((-75, -0.000786438)):
            Rectangle(SKETCH25_W, SKETCH25_H)
    cut_extrude13_tool8 = extrude(cut_extrude13_sk8.sketch, amount=-CUT_EXTRUDE13_REACH, mode=Mode.PRIVATE) & part.part
    add(cut_extrude13_tool1.solids().sort_by_distance((-17.172129, 17.171017, 15))[0], mode=Mode.SUBTRACT)
    add(cut_extrude13_tool2.solids().sort_by_distance((-17.172129, 17.171017, 25))[0], mode=Mode.SUBTRACT)
    add(cut_extrude13_tool3.solids().sort_by_distance((-17.172129, 17.171017, 35))[0], mode=Mode.SUBTRACT)
    add(cut_extrude13_tool4.solids().sort_by_distance((-17.172129, 17.171017, 45))[0], mode=Mode.SUBTRACT)
    add(cut_extrude13_tool5.solids().sort_by_distance((-17.172129, 17.171017, 65))[0], mode=Mode.SUBTRACT)
    add(cut_extrude13_tool6.solids().sort_by_distance((-17.172129, 17.171017, 95))[0], mode=Mode.SUBTRACT)
    add(cut_extrude13_tool7.solids().sort_by_distance((-17.172129, 17.171017, 85))[0], mode=Mode.SUBTRACT)
    add(cut_extrude13_tool8.solids().sort_by_distance((-17.172129, 17.171017, 75))[0], mode=Mode.SUBTRACT)

    # Sketch26 → Cut-Extrude14 (cut, up to next)
    with BuildSketch(Plane(origin=(-17.171572875, -17.171572875, 0), x_dir=(0, 0, -1), z_dir=(0.7071067811865477, 0.7071067811865475, 0)), mode=Mode.PRIVATE) as cut_extrude14_sk1:
        with Locations((-75.354101966, 0.000786438)):
            Rectangle(SKETCH26_W, SKETCH26_H)
    cut_extrude14_tool1 = extrude(cut_extrude14_sk1.sketch, amount=-CUT_EXTRUDE14_REACH, mode=Mode.PRIVATE) & part.part
    # Sketch26 → Cut-Extrude14 (cut, up to next)
    with BuildSketch(Plane(origin=(-17.171572875, -17.171572875, 0), x_dir=(0, 0, -1), z_dir=(0.7071067811865477, 0.7071067811865475, 0)), mode=Mode.PRIVATE) as cut_extrude14_sk2:
        with Locations((-65.354101966, 0.000786438)):
            Rectangle(SKETCH26_W, SKETCH26_H)
    cut_extrude14_tool2 = extrude(cut_extrude14_sk2.sketch, amount=-CUT_EXTRUDE14_REACH, mode=Mode.PRIVATE) & part.part
    # Sketch26 → Cut-Extrude14 (cut, up to next)
    with BuildSketch(Plane(origin=(-17.171572875, -17.171572875, 0), x_dir=(0, 0, -1), z_dir=(0.7071067811865477, 0.7071067811865475, 0)), mode=Mode.PRIVATE) as cut_extrude14_sk3:
        with Locations((-85.354101966, 0.000786438)):
            Rectangle(SKETCH26_W, SKETCH26_H)
    cut_extrude14_tool3 = extrude(cut_extrude14_sk3.sketch, amount=-CUT_EXTRUDE14_REACH, mode=Mode.PRIVATE) & part.part
    # Sketch26 → Cut-Extrude14 (cut, up to next)
    with BuildSketch(Plane(origin=(-17.171572875, -17.171572875, 0), x_dir=(0, 0, -1), z_dir=(0.7071067811865477, 0.7071067811865475, 0)), mode=Mode.PRIVATE) as cut_extrude14_sk4:
        with Locations((-95.354101966, 0.000786438)):
            Rectangle(SKETCH26_W, SKETCH26_H)
    cut_extrude14_tool4 = extrude(cut_extrude14_sk4.sketch, amount=-CUT_EXTRUDE14_REACH, mode=Mode.PRIVATE) & part.part
    add(cut_extrude14_tool1.solids().sort_by_distance((-17.172129, -17.171017, 75.354102))[0], mode=Mode.SUBTRACT)
    add(cut_extrude14_tool2.solids().sort_by_distance((-17.172129, -17.171017, 65.354102))[0], mode=Mode.SUBTRACT)
    add(cut_extrude14_tool3.solids().sort_by_distance((-17.172129, -17.171017, 85.354102))[0], mode=Mode.SUBTRACT)
    add(cut_extrude14_tool4.solids().sort_by_distance((-17.172129, -17.171017, 95.354102))[0], mode=Mode.SUBTRACT)

    # Sketch27 → Cut-Extrude15 (cut)
    with BuildSketch(Plane.ZY.offset(25)):
        Polygon((0, 25), (30, 25.37339009), (30, 23.862428396), (30, 10), (30, -10), (30.637277606, -25.82863339), (0, -25.82863339), (0, -25), align=None)
    extrude(amount=-CUT_EXTRUDE15_DEPTH, mode=Mode.SUBTRACT)


solid = part.part
